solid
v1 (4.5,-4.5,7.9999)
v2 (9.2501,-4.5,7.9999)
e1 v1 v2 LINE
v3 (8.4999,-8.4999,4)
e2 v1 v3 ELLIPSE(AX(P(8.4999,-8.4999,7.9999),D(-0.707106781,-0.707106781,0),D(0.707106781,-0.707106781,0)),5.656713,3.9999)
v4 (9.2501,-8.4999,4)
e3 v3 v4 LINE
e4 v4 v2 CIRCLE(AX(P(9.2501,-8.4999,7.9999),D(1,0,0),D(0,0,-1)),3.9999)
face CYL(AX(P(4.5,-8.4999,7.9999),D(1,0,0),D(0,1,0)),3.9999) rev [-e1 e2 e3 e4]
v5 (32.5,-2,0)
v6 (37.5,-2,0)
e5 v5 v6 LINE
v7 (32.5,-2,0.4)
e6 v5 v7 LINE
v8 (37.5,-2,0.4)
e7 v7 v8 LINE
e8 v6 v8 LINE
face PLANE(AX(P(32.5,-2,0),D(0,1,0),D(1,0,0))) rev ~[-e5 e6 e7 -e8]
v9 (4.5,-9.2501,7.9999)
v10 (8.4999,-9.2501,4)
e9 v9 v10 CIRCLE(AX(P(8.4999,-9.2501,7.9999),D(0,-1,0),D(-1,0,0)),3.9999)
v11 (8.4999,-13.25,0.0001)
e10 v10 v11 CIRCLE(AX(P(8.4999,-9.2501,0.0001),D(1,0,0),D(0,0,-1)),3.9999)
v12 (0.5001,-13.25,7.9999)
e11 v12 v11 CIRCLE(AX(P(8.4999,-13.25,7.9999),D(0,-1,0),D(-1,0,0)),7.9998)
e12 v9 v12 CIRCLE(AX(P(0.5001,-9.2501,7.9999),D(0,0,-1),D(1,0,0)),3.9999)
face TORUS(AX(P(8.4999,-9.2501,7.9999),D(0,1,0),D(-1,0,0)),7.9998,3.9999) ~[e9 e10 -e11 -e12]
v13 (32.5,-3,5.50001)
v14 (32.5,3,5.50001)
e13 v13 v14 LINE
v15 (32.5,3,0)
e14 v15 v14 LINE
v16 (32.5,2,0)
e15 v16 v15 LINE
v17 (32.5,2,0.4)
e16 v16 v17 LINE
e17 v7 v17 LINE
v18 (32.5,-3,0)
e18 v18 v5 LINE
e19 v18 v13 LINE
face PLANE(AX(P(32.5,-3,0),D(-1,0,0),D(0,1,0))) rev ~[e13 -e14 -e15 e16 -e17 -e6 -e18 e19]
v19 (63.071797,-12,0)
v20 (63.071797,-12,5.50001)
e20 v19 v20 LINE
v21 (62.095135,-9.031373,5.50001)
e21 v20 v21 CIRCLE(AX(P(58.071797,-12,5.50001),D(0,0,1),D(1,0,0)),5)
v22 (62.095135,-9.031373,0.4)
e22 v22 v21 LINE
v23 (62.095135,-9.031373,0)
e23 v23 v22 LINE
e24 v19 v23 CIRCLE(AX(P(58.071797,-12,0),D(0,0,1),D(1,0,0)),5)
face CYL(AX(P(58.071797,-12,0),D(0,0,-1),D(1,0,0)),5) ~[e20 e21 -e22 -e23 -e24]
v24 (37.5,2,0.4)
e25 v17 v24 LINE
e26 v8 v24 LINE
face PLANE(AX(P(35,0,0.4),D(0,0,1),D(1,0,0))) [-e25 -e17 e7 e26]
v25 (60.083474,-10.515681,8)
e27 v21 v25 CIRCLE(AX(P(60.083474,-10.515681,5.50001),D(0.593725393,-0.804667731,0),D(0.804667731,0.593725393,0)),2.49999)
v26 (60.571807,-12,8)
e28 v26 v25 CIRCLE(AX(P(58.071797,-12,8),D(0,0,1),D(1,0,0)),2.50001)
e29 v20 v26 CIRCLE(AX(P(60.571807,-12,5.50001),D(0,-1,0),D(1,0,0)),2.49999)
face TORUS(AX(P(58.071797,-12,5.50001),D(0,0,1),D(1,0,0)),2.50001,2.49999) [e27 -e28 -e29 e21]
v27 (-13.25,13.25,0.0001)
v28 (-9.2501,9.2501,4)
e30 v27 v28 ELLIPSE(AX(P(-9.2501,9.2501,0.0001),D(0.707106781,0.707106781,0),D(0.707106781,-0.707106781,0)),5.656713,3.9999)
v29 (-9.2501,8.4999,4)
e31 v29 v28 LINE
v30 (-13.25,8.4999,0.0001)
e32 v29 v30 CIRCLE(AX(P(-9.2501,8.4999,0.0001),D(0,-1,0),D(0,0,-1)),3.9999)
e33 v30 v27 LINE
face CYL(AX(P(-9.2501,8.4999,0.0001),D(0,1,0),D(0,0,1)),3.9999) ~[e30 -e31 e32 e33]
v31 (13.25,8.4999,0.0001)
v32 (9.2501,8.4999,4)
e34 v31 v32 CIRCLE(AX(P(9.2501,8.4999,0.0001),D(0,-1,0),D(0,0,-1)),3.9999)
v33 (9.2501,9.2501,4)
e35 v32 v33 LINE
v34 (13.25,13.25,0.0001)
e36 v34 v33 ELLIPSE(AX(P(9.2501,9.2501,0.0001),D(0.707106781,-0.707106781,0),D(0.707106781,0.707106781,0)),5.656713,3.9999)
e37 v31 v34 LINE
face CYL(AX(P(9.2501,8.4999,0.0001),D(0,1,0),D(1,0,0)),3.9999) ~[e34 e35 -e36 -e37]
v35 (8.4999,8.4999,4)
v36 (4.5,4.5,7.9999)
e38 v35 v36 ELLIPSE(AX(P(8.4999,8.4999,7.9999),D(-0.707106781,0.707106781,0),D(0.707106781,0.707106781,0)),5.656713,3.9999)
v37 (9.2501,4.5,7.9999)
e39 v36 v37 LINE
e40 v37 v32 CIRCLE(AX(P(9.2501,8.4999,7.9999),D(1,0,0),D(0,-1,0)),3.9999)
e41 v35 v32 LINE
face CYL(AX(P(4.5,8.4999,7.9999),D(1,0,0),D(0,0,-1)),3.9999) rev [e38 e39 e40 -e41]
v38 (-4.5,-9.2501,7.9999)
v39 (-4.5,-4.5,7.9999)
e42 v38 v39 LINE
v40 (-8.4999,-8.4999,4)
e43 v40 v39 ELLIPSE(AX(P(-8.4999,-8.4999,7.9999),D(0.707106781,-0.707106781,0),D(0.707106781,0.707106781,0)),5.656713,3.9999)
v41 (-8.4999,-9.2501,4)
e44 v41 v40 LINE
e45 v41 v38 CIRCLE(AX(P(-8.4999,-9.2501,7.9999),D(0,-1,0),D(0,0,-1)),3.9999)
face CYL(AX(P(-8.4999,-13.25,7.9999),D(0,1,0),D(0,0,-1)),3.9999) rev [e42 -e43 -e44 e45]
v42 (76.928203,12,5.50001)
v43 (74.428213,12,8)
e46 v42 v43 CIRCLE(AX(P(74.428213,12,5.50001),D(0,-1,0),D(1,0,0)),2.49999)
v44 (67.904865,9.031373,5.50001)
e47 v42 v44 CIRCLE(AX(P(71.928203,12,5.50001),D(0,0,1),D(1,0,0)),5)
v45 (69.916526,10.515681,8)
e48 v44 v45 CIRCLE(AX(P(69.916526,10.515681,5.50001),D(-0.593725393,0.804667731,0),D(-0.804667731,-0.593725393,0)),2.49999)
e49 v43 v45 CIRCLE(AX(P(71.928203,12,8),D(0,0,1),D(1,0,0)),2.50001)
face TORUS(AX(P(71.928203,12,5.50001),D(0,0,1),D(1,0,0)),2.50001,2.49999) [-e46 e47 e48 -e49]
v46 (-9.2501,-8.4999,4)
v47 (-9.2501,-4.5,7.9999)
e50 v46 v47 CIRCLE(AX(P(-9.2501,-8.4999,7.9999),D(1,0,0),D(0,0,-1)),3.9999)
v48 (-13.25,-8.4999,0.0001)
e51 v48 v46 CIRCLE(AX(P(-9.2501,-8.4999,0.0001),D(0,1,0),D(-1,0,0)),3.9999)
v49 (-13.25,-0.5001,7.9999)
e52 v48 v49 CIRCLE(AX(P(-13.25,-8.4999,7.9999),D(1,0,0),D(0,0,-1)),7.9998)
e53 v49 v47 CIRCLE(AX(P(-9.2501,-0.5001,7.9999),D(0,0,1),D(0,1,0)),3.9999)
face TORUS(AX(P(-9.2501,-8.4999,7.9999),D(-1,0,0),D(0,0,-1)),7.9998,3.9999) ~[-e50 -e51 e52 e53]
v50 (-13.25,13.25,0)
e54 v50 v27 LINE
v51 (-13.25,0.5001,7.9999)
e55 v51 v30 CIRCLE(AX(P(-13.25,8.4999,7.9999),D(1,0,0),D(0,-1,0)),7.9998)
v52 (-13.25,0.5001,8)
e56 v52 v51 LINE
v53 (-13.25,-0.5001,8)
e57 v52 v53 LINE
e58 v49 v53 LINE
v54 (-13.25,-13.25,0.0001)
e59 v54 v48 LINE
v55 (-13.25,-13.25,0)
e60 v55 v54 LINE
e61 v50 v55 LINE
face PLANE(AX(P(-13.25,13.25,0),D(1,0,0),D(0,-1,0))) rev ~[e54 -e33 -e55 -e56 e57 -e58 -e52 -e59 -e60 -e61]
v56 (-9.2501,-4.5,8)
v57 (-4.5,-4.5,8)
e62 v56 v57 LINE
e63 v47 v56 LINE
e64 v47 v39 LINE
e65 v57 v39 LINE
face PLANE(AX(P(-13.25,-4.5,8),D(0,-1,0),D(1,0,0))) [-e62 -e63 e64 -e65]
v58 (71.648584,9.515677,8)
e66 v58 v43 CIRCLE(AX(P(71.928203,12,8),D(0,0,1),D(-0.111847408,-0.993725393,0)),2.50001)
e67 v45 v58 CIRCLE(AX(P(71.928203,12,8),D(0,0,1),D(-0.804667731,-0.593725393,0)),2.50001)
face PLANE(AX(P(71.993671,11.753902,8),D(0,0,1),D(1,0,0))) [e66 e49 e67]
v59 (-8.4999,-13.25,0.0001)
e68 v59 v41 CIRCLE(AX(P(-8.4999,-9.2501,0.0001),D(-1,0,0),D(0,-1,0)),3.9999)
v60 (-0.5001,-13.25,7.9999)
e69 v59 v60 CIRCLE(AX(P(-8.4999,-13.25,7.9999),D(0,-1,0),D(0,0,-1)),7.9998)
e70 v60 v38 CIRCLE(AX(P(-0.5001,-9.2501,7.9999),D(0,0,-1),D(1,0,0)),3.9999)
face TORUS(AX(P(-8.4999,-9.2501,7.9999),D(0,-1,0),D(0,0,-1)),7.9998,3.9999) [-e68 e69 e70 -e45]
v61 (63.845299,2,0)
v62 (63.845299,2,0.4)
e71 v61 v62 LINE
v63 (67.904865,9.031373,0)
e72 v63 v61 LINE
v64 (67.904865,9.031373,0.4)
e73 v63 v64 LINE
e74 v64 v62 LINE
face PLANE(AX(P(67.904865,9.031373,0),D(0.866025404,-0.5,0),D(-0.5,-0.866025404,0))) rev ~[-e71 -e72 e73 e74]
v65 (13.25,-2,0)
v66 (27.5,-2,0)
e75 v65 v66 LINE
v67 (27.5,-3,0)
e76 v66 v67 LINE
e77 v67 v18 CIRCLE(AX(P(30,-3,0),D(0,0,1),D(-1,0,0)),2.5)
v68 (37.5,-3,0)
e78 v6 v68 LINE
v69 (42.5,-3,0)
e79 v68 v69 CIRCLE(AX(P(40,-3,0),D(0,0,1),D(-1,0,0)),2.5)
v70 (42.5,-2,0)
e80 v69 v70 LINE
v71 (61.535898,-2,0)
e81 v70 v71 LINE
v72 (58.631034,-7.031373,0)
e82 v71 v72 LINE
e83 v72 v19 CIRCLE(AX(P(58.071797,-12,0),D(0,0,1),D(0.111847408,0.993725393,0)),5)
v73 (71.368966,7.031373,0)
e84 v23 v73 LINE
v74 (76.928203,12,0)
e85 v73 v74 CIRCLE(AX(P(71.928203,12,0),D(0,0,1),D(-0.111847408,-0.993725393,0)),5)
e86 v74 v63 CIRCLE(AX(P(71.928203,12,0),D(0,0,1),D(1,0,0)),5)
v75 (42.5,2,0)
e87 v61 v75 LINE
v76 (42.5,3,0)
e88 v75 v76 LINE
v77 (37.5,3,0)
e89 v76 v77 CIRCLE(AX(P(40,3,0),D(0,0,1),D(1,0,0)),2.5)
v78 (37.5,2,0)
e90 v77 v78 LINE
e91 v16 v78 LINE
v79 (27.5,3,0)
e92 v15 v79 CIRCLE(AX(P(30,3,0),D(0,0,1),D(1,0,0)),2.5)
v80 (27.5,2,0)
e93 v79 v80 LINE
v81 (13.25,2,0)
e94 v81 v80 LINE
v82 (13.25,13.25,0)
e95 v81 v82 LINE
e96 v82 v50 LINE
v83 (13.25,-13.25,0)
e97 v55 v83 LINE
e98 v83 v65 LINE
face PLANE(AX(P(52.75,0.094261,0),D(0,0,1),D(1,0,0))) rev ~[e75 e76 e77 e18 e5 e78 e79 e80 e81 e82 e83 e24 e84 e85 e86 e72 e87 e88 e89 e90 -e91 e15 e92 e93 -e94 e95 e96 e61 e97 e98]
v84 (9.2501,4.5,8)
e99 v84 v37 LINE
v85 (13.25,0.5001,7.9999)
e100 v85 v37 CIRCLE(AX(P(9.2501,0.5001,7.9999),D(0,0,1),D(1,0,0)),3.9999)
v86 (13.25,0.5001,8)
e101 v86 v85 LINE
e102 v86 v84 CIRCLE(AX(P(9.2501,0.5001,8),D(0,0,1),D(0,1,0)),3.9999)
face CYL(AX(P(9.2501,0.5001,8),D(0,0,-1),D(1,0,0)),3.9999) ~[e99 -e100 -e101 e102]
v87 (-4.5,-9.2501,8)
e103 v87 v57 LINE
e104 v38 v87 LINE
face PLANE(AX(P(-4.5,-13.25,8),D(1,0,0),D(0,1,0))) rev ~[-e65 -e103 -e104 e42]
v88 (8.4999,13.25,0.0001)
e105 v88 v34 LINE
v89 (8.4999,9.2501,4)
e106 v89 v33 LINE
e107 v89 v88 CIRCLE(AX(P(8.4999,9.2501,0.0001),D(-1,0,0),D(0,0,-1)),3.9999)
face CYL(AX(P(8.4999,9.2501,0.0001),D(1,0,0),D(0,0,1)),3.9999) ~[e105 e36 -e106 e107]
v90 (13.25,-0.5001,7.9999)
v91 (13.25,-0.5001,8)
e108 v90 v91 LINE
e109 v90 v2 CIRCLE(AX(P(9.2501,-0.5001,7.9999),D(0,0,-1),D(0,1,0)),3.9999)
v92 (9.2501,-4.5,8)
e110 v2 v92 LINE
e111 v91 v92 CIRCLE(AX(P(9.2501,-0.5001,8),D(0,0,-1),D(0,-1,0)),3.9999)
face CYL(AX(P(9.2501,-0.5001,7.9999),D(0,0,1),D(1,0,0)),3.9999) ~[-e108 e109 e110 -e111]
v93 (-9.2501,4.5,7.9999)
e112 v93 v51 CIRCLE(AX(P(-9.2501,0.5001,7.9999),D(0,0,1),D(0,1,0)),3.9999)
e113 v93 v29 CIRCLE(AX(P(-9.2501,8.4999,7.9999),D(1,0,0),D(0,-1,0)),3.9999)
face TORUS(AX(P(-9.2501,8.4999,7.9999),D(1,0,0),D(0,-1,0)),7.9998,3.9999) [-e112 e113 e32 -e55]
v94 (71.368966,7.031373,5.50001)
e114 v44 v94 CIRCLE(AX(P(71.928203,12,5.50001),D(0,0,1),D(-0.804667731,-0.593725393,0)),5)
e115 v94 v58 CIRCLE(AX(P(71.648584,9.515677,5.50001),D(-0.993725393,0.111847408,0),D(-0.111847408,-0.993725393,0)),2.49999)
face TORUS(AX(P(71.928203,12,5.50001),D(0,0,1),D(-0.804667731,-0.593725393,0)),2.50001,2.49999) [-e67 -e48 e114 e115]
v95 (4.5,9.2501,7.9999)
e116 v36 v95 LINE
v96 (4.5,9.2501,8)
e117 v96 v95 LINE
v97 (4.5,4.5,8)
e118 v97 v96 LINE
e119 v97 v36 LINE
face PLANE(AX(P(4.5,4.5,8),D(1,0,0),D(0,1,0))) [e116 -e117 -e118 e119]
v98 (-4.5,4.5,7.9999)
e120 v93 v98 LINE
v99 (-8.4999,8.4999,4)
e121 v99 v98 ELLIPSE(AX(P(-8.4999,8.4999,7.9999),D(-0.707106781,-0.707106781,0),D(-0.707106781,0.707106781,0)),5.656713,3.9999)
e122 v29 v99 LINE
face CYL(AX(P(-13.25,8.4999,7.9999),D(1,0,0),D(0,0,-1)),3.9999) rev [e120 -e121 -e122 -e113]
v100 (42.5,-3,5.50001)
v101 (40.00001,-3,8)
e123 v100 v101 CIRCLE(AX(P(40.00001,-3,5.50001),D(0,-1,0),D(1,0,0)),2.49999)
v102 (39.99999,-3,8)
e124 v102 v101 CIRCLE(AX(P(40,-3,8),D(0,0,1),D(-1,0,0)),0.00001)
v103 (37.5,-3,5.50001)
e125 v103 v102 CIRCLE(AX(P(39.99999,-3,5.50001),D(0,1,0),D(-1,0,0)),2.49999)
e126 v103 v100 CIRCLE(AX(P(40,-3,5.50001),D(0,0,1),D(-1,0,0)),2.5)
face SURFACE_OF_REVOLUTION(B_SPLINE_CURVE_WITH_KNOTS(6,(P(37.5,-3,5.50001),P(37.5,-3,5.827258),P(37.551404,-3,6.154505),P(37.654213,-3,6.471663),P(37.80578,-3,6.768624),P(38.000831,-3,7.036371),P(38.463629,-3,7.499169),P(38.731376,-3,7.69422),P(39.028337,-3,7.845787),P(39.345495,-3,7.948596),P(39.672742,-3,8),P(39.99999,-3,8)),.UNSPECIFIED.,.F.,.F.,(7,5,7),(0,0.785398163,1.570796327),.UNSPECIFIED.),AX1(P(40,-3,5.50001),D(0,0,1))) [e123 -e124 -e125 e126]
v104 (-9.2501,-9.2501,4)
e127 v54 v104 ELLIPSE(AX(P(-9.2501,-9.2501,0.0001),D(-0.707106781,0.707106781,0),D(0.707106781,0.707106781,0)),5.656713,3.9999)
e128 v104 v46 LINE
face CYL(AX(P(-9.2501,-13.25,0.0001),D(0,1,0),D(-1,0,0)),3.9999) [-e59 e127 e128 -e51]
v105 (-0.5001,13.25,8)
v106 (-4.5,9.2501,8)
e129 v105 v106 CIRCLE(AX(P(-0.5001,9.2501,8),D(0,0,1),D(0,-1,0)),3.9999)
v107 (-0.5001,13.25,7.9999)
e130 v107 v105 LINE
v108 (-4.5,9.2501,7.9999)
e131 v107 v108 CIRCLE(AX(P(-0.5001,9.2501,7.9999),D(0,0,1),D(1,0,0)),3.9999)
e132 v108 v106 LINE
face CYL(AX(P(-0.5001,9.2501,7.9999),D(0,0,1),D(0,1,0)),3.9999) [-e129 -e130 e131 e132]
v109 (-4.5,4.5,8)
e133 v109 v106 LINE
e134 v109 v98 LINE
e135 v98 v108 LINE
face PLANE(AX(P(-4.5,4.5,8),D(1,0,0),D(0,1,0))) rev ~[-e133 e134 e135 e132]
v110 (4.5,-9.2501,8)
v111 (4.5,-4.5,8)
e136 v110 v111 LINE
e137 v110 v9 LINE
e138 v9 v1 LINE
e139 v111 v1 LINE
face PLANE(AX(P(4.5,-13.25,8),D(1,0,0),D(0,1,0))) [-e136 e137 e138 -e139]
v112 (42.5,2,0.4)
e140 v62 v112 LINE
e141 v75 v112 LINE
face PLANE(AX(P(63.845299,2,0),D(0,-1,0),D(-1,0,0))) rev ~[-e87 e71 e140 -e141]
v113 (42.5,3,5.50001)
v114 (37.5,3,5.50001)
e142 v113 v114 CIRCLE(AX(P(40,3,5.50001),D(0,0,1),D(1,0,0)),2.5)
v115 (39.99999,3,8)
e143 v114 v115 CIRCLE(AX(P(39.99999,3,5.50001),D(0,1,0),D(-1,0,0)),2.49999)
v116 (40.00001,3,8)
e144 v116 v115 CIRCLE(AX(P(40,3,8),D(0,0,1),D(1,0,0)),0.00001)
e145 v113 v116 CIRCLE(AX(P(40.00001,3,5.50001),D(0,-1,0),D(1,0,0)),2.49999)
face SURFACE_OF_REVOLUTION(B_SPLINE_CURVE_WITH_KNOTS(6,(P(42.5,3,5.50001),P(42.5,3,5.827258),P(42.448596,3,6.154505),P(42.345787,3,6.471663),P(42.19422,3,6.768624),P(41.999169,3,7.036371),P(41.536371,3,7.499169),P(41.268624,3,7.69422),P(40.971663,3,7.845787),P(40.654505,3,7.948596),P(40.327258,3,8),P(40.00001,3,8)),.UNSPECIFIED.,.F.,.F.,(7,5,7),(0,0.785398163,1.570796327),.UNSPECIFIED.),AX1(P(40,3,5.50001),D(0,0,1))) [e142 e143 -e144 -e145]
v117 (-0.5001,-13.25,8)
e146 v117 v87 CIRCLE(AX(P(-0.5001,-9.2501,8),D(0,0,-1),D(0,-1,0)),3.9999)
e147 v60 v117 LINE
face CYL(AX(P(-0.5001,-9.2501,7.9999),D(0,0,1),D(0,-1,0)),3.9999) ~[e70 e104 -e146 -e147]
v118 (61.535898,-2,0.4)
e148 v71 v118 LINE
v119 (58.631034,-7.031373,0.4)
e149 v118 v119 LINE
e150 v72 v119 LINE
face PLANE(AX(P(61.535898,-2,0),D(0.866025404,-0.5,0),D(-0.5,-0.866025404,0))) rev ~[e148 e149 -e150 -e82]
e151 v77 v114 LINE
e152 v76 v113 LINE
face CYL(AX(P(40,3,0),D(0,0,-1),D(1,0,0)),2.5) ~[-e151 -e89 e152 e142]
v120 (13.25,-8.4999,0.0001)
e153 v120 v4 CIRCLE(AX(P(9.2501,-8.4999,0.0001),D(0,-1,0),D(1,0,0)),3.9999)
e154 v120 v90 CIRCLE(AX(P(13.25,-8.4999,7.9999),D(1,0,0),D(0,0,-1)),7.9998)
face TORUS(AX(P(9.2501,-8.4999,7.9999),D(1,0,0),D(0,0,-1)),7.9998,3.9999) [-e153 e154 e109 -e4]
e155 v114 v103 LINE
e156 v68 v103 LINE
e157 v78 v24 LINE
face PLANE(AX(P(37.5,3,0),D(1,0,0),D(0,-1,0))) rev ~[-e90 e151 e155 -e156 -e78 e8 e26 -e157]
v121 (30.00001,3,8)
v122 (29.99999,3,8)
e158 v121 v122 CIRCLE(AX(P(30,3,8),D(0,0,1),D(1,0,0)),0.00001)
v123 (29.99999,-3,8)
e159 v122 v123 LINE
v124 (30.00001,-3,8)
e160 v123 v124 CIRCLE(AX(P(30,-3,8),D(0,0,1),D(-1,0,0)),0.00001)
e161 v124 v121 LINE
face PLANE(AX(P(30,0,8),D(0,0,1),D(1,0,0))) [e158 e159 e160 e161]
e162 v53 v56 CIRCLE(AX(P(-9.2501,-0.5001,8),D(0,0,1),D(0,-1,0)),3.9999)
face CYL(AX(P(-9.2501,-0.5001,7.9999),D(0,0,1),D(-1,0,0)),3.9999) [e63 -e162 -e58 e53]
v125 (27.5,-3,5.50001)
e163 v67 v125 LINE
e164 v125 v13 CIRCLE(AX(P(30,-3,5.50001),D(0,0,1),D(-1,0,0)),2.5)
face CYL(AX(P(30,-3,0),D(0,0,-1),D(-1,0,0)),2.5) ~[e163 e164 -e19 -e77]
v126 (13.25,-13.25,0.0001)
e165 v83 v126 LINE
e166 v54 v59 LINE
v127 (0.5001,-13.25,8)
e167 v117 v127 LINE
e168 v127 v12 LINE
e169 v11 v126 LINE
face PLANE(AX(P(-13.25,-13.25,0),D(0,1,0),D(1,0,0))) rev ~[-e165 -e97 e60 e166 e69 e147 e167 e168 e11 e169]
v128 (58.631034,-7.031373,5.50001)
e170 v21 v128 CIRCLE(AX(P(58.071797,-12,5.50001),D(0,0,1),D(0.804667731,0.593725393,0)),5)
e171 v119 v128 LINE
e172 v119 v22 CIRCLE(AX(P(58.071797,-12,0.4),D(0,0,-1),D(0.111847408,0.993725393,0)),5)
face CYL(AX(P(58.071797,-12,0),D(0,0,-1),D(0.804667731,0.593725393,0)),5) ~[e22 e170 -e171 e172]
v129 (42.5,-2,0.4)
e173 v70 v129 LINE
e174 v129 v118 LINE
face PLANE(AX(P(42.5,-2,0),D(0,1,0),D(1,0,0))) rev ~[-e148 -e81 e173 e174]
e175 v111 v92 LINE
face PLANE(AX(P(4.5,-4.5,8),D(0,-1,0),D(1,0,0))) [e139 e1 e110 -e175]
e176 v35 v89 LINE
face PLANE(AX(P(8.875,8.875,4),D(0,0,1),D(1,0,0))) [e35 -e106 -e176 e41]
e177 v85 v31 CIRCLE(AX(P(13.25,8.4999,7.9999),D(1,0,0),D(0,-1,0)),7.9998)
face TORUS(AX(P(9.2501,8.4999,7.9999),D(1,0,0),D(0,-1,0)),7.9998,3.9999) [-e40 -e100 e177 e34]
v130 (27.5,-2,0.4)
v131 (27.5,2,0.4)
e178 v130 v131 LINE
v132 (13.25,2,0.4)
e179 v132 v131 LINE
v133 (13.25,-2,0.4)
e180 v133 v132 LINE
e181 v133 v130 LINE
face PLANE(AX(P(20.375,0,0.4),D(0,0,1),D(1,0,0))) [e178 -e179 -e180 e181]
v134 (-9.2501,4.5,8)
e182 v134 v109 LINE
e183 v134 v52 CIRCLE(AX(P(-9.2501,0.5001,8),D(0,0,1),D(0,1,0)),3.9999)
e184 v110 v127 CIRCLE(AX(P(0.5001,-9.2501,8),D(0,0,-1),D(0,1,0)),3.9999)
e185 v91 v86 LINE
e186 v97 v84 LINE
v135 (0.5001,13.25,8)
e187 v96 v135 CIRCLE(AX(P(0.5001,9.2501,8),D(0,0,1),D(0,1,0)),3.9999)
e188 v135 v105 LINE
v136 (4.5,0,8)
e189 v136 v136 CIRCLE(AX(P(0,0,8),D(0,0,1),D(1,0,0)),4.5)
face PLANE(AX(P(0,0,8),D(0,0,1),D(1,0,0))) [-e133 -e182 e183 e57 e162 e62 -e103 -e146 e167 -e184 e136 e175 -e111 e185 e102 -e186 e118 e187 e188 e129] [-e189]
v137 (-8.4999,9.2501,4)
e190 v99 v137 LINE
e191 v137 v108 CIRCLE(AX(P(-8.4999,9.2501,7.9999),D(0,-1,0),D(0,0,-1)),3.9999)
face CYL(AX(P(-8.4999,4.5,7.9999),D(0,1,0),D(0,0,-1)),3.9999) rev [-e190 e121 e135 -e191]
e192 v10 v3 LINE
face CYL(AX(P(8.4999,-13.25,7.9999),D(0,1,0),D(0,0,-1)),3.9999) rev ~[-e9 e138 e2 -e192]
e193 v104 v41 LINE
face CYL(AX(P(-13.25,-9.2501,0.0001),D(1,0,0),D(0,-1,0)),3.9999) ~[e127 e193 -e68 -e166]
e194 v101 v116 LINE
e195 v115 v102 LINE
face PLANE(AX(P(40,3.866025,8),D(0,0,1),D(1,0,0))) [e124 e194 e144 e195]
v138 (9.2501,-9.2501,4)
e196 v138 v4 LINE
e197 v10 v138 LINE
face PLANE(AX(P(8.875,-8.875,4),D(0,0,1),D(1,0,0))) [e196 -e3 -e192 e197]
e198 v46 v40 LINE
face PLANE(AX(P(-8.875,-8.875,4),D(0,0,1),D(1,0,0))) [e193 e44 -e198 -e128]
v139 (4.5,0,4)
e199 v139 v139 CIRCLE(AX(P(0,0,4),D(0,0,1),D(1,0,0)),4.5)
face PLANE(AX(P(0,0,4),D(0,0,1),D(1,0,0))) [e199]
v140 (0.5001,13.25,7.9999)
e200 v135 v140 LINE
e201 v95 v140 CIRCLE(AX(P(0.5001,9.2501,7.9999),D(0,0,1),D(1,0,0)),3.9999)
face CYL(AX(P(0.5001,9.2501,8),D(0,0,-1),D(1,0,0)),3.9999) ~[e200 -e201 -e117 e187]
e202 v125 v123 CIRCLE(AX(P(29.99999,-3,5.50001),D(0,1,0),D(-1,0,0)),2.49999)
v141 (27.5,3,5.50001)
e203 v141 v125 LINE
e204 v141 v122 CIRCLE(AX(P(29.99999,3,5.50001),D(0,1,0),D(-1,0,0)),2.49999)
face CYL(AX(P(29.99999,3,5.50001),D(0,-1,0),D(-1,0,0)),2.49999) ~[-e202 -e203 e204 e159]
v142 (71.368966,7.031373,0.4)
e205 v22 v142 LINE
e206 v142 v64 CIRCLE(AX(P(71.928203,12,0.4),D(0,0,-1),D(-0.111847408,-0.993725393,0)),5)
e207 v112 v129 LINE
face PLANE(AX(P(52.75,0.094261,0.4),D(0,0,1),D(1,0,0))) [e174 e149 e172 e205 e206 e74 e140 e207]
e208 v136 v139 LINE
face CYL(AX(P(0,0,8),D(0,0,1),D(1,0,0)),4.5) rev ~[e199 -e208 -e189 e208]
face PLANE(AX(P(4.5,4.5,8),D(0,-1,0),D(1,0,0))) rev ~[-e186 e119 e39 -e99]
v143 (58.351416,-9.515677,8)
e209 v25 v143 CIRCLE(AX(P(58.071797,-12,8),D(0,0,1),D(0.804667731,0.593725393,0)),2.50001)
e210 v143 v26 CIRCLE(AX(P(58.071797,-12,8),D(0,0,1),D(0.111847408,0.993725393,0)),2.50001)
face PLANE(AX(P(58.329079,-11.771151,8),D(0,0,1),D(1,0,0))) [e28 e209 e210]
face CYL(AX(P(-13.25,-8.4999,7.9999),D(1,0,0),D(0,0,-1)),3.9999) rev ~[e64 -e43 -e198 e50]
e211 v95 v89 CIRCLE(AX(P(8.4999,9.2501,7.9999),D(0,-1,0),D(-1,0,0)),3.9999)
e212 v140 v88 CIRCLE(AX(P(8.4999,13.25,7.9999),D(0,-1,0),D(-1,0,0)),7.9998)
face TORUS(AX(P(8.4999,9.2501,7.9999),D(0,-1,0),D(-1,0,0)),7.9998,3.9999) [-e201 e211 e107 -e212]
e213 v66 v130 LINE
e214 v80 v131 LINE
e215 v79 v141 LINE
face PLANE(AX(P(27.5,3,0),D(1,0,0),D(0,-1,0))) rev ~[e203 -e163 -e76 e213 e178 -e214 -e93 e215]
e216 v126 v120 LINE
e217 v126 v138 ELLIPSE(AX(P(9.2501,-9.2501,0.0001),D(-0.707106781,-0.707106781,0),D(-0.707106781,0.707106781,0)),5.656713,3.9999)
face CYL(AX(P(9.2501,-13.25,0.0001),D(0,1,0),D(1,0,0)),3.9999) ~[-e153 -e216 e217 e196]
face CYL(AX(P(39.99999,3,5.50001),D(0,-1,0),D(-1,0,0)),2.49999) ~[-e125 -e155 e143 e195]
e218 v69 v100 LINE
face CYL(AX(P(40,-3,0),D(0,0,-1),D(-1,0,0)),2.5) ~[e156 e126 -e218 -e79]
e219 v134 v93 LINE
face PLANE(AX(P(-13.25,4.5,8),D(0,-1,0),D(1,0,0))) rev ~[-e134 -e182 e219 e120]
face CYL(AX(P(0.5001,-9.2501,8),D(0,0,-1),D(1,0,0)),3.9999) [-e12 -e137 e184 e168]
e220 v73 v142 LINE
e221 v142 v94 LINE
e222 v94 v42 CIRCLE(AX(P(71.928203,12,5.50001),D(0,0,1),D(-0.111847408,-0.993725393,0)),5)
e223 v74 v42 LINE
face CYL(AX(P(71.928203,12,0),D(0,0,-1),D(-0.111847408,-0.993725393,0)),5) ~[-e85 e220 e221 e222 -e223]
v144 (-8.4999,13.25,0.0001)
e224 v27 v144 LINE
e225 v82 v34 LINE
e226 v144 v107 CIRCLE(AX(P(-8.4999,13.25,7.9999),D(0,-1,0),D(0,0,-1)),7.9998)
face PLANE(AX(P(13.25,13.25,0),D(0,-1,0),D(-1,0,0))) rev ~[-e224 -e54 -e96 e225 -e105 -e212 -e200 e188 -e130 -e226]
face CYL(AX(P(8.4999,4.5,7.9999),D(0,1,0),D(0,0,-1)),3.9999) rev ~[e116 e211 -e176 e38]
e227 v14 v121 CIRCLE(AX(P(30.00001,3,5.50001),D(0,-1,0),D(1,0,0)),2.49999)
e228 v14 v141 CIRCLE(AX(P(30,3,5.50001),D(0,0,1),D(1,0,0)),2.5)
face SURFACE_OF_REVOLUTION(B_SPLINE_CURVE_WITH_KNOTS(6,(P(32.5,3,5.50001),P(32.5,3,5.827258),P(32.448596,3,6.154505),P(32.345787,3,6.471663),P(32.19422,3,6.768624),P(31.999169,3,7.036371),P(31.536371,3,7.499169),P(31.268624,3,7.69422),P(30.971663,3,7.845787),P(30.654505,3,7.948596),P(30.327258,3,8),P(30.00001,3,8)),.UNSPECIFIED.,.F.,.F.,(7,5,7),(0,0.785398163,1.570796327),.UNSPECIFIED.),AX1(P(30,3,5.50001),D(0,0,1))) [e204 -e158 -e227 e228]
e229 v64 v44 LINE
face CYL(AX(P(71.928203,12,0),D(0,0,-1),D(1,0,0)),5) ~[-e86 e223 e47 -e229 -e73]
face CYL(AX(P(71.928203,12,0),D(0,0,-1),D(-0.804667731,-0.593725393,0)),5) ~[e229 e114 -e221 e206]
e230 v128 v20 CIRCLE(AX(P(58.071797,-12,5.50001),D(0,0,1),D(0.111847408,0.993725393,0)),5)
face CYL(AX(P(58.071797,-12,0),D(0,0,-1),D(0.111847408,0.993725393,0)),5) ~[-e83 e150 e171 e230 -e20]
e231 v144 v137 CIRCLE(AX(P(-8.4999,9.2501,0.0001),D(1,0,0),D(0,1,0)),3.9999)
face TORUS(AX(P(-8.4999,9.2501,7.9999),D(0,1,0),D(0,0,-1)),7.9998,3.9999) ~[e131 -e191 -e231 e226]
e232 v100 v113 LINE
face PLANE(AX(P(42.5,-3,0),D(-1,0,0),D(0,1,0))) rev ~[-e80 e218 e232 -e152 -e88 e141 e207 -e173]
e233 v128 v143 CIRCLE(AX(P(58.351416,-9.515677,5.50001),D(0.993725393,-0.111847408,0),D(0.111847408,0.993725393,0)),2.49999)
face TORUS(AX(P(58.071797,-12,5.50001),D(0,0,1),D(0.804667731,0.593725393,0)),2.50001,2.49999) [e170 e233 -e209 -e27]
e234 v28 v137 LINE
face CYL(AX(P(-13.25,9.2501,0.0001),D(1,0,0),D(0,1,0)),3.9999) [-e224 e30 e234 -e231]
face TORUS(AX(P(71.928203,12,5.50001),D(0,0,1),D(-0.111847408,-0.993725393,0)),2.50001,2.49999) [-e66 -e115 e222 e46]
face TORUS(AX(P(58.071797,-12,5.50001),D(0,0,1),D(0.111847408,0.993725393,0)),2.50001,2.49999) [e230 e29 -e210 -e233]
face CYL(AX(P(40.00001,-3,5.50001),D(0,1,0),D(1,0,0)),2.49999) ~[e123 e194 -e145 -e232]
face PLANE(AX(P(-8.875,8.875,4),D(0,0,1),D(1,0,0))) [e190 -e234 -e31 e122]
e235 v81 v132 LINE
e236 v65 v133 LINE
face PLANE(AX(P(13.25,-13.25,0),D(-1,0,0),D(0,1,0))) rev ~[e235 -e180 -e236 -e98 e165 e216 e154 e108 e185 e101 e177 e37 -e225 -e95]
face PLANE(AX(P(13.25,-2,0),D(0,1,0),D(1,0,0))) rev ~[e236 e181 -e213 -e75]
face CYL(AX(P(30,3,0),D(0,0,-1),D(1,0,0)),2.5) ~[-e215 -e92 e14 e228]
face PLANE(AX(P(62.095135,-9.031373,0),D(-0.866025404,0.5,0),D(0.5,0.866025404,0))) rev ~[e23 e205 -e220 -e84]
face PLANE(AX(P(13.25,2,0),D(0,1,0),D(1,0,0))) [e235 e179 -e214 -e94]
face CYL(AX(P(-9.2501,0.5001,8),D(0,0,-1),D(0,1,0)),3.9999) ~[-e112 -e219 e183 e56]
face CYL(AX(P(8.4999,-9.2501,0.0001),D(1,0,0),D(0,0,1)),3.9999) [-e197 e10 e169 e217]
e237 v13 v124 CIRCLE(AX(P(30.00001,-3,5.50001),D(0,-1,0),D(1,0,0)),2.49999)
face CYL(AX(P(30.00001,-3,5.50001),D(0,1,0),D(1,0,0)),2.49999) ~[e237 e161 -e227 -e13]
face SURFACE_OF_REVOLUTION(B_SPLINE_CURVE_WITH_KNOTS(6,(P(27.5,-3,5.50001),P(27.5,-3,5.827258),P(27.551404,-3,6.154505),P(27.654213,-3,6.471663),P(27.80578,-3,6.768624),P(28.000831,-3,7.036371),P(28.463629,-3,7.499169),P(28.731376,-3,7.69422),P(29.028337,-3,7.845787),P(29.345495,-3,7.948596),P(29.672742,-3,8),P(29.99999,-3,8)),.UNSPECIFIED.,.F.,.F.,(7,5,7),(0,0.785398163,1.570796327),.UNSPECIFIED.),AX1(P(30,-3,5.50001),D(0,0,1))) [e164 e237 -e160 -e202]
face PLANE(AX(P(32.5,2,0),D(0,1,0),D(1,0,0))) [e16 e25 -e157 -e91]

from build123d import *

# Parameters (mm, degrees)
F1_DEPTH = 8
F0_W     = 14.25
F0_H     = 4
F0_W_2   = 5
F2_DEPTH = 0.4
F3_R     = 2.49999
F4_R     = 4.5
F4_W     = 8.75
F4_H     = 8.75
F5_DEPTH = 4
F6_F1_R  = 3.9999
F6_F2_R  = 3.9999


# Not quite as in the source:
# - a fillet or chamfer is up to 0.001 mm smaller than in the source, because OpenCascade refuses the exact size


with BuildPart() as f1:
    # F0 (on Top) → F1 (new body)
    with BuildSketch(Plane.XY):
        Polygon((13.25, 2), (13.25, 13.25), (-13.25, 13.25), (-13.25, -13.25), (13.25, -13.25), (13.25, -2), align=None)
    extrude(amount=F1_DEPTH)



with BuildPart() as f1b:
    # F0 (on Top) → F1, piece 2 (new body)
    with BuildSketch(Plane.XY):
        Polygon((27.5, 3), (27.5, 2), (27.5, -2), (27.5, -3), (32.5, -3), (32.5, -2), (32.5, 2), (32.5, 3), align=None)
        with BuildLine():
            ThreePointArc((32.5, 3), (30, 5.5), (27.5, 3))
            Line((27.5, 3), (32.5, 3))
        make_face()
        with BuildLine():
            Line((32.5, -3), (27.5, -3))
            ThreePointArc((27.5, -3), (30, -5.5), (32.5, -3))
        make_face()
    extrude(amount=F1_DEPTH)


with BuildPart() as f1c:
    # F0 (on Top) → F1, piece 3 (new body)
    with BuildSketch(Plane.XY):
        with BuildLine():
            ThreePointArc((42.5, 3), (40, 5.5), (37.5, 3))
            Line((37.5, 3), (42.5, 3))
        make_face()
        Polygon((37.5, 3), (37.5, 2), (37.5, -2), (37.5, -3), (42.5, -3), (42.5, -2), (42.5, 2), (42.5, 3), align=None)
        with BuildLine():
            Line((42.5, -3), (37.5, -3))
            ThreePointArc((37.5, -3), (40, -5.5), (42.5, -3))
        make_face()
    extrude(amount=F1_DEPTH)


with BuildPart() as f1d:
    # F0 (on Top) → F1, piece 4 (new body)
    with BuildSketch(Plane.XY):
        with BuildLine():
            ThreePointArc((62.0951354248, -9.0313730334), (60.5717967697, -7.6698729811), (58.6310338096, -7.0313730334))
            ThreePointArc((58.6310338096, -7.0313730334), (54.3437822043, -15.3319524907), (63.0717967697, -12))
            ThreePointArc((63.0717967697, -12), (62.8213595536, -10.437420926), (62.0951354248, -9.0313730334))
        make_face()
    extrude(amount=F1_DEPTH)


with BuildPart() as f1e:
    # F0 (on Top) → F1, piece 5 (new body)
    with BuildSketch(Plane.XY):
        with BuildLine():
            ThreePointArc((76.9282032303, 12), (70.3656241563, 16.7495627838), (67.9048645752, 9.0313730334))
            ThreePointArc((67.9048645752, 9.0313730334), (69.4282032303, 7.6698729811), (71.3689661904, 7.0313730334))
            ThreePointArc((71.3689661904, 7.0313730334), (75.260155721, 8.2719854346), (76.9282032303, 12))
        make_face()
    extrude(amount=F1_DEPTH)


with BuildPart() as f1_1:
    add(f1.part)

    add(f1b.part)  # F2 merges F1b

    add(f1c.part)  # F2 merges F1c

    add(f1d.part)  # F2 merges F1d

    add(f1e.part)  # F2 merges F1e
    # F0 (on Top) → F2 (join)
    with BuildSketch(Plane.XY):
        with Locations((20.375, 0)):
            Rectangle(F0_W, F0_H)
        with Locations((35, 0)):
            Rectangle(F0_W_2, F0_H)
        Polygon((63.8452994616, 2), (42.5, 2), (42.5, -2), (61.5358983849, -2), align=None)
        with BuildLine():
            Line((67.9048645752, 9.0313730334), (63.8452994616, 2))
            Line((63.8452994616, 2), (61.5358983849, -2))
            Line((61.5358983849, -2), (58.6310338096, -7.0313730334))
            ThreePointArc((58.6310338096, -7.0313730334), (60.5717967697, -7.6698729811), (62.0951354248, -9.0313730334))
            Line((62.0951354248, -9.0313730334), (71.3689661904, 7.0313730334))
            ThreePointArc((71.3689661904, 7.0313730334), (69.4282032303, 7.6698729811), (67.9048645752, 9.0313730334))
        make_face()
    extrude(amount=F2_DEPTH)

    # F3 (radius 2.5 in the source; OpenCascade refuses exactly that, so slightly less here)
    f3_edges = [f1_1.edges().sort_by_distance(p)[0] for p in [
        (53.071797, -12, 8),
        (75.951542, 14.968627, 8),
        (42.5, 0, 8),
        (27.5, 0, 8),
        (30, -5.5, 8),
        (32.5, 0, 8),
        (30, 5.5, 8),
        (40, 5.5, 8),
        (37.5, 0, 8),
        (40, -5.5, 8),
    ]]
    fillet(f3_edges, radius=F3_R)

    # F4 (on face) → F5 (cut)
    with BuildSketch(Plane.XY.offset(8)):
        Circle(F4_R)
        with Locations((8.875, 8.875)):
            Rectangle(F4_W, F4_H)
        with Locations((-8.875, 8.875)):
            Rectangle(F4_W, F4_H)
        with Locations((-8.875, -8.875)):
            Rectangle(F4_W, F4_H)
        with Locations((8.875, -8.875)):
            Rectangle(F4_W, F4_H)
    extrude(amount=-F5_DEPTH, mode=Mode.SUBTRACT)

    # F6: fillet of radius 4 on 16 edges, made by hand

    # F6_f1 (radius 4 in the source; OpenCascade refuses exactly that, so slightly less here)
    f6_f1_edges = [f1_1.edges().sort_by_distance(p)[0] for p in [
        (-4.5, 8.875, 4),
        (-8.875, 4.5, 4),
        (4.5, 8.875, 4),
        (8.875, 4.5, 4),
        (-8.875, -4.5, 4),
        (-4.5, -8.875, 4),
        (8.875, -4.5, 4),
        (4.5, -8.875, 4),
    ]]
    fillet(f6_f1_edges, radius=F6_F1_R)

    # F6_f2 (radius 4 in the source; OpenCascade refuses exactly that, so slightly less here)
    f6_f2_edges = [f1_1.edges().sort_by_distance(p)[0] for p in [
        (-10.87495, 13.25, 4),
        (-13.25, 10.87495, 4),
        (13.25, 10.87495, 4),
        (10.87495, 13.25, 4),
        (-13.25, -10.87495, 4),
        (-10.87495, -13.25, 4),
        (13.25, -10.87495, 4),
        (10.87495, -13.25, 4),
        (5.6715435859, -13.25, 5.1715435859),
        (13.25, -5.6715435859, 5.1715435859),
        (-5.6715435859, -13.25, 5.1715435859),
        (-13.25, -5.6715435859, 5.1715435859),
        (5.6715435859, 13.25, 5.1715435859),
        (13.25, 5.6715435859, 5.1715435859),
        (-13.25, 5.6715435859, 5.1715435859),
        (-5.6715435859, 13.25, 5.1715435859),
    ]]
    fillet(f6_f2_edges, radius=F6_F2_R)


solid = f1_1.part
